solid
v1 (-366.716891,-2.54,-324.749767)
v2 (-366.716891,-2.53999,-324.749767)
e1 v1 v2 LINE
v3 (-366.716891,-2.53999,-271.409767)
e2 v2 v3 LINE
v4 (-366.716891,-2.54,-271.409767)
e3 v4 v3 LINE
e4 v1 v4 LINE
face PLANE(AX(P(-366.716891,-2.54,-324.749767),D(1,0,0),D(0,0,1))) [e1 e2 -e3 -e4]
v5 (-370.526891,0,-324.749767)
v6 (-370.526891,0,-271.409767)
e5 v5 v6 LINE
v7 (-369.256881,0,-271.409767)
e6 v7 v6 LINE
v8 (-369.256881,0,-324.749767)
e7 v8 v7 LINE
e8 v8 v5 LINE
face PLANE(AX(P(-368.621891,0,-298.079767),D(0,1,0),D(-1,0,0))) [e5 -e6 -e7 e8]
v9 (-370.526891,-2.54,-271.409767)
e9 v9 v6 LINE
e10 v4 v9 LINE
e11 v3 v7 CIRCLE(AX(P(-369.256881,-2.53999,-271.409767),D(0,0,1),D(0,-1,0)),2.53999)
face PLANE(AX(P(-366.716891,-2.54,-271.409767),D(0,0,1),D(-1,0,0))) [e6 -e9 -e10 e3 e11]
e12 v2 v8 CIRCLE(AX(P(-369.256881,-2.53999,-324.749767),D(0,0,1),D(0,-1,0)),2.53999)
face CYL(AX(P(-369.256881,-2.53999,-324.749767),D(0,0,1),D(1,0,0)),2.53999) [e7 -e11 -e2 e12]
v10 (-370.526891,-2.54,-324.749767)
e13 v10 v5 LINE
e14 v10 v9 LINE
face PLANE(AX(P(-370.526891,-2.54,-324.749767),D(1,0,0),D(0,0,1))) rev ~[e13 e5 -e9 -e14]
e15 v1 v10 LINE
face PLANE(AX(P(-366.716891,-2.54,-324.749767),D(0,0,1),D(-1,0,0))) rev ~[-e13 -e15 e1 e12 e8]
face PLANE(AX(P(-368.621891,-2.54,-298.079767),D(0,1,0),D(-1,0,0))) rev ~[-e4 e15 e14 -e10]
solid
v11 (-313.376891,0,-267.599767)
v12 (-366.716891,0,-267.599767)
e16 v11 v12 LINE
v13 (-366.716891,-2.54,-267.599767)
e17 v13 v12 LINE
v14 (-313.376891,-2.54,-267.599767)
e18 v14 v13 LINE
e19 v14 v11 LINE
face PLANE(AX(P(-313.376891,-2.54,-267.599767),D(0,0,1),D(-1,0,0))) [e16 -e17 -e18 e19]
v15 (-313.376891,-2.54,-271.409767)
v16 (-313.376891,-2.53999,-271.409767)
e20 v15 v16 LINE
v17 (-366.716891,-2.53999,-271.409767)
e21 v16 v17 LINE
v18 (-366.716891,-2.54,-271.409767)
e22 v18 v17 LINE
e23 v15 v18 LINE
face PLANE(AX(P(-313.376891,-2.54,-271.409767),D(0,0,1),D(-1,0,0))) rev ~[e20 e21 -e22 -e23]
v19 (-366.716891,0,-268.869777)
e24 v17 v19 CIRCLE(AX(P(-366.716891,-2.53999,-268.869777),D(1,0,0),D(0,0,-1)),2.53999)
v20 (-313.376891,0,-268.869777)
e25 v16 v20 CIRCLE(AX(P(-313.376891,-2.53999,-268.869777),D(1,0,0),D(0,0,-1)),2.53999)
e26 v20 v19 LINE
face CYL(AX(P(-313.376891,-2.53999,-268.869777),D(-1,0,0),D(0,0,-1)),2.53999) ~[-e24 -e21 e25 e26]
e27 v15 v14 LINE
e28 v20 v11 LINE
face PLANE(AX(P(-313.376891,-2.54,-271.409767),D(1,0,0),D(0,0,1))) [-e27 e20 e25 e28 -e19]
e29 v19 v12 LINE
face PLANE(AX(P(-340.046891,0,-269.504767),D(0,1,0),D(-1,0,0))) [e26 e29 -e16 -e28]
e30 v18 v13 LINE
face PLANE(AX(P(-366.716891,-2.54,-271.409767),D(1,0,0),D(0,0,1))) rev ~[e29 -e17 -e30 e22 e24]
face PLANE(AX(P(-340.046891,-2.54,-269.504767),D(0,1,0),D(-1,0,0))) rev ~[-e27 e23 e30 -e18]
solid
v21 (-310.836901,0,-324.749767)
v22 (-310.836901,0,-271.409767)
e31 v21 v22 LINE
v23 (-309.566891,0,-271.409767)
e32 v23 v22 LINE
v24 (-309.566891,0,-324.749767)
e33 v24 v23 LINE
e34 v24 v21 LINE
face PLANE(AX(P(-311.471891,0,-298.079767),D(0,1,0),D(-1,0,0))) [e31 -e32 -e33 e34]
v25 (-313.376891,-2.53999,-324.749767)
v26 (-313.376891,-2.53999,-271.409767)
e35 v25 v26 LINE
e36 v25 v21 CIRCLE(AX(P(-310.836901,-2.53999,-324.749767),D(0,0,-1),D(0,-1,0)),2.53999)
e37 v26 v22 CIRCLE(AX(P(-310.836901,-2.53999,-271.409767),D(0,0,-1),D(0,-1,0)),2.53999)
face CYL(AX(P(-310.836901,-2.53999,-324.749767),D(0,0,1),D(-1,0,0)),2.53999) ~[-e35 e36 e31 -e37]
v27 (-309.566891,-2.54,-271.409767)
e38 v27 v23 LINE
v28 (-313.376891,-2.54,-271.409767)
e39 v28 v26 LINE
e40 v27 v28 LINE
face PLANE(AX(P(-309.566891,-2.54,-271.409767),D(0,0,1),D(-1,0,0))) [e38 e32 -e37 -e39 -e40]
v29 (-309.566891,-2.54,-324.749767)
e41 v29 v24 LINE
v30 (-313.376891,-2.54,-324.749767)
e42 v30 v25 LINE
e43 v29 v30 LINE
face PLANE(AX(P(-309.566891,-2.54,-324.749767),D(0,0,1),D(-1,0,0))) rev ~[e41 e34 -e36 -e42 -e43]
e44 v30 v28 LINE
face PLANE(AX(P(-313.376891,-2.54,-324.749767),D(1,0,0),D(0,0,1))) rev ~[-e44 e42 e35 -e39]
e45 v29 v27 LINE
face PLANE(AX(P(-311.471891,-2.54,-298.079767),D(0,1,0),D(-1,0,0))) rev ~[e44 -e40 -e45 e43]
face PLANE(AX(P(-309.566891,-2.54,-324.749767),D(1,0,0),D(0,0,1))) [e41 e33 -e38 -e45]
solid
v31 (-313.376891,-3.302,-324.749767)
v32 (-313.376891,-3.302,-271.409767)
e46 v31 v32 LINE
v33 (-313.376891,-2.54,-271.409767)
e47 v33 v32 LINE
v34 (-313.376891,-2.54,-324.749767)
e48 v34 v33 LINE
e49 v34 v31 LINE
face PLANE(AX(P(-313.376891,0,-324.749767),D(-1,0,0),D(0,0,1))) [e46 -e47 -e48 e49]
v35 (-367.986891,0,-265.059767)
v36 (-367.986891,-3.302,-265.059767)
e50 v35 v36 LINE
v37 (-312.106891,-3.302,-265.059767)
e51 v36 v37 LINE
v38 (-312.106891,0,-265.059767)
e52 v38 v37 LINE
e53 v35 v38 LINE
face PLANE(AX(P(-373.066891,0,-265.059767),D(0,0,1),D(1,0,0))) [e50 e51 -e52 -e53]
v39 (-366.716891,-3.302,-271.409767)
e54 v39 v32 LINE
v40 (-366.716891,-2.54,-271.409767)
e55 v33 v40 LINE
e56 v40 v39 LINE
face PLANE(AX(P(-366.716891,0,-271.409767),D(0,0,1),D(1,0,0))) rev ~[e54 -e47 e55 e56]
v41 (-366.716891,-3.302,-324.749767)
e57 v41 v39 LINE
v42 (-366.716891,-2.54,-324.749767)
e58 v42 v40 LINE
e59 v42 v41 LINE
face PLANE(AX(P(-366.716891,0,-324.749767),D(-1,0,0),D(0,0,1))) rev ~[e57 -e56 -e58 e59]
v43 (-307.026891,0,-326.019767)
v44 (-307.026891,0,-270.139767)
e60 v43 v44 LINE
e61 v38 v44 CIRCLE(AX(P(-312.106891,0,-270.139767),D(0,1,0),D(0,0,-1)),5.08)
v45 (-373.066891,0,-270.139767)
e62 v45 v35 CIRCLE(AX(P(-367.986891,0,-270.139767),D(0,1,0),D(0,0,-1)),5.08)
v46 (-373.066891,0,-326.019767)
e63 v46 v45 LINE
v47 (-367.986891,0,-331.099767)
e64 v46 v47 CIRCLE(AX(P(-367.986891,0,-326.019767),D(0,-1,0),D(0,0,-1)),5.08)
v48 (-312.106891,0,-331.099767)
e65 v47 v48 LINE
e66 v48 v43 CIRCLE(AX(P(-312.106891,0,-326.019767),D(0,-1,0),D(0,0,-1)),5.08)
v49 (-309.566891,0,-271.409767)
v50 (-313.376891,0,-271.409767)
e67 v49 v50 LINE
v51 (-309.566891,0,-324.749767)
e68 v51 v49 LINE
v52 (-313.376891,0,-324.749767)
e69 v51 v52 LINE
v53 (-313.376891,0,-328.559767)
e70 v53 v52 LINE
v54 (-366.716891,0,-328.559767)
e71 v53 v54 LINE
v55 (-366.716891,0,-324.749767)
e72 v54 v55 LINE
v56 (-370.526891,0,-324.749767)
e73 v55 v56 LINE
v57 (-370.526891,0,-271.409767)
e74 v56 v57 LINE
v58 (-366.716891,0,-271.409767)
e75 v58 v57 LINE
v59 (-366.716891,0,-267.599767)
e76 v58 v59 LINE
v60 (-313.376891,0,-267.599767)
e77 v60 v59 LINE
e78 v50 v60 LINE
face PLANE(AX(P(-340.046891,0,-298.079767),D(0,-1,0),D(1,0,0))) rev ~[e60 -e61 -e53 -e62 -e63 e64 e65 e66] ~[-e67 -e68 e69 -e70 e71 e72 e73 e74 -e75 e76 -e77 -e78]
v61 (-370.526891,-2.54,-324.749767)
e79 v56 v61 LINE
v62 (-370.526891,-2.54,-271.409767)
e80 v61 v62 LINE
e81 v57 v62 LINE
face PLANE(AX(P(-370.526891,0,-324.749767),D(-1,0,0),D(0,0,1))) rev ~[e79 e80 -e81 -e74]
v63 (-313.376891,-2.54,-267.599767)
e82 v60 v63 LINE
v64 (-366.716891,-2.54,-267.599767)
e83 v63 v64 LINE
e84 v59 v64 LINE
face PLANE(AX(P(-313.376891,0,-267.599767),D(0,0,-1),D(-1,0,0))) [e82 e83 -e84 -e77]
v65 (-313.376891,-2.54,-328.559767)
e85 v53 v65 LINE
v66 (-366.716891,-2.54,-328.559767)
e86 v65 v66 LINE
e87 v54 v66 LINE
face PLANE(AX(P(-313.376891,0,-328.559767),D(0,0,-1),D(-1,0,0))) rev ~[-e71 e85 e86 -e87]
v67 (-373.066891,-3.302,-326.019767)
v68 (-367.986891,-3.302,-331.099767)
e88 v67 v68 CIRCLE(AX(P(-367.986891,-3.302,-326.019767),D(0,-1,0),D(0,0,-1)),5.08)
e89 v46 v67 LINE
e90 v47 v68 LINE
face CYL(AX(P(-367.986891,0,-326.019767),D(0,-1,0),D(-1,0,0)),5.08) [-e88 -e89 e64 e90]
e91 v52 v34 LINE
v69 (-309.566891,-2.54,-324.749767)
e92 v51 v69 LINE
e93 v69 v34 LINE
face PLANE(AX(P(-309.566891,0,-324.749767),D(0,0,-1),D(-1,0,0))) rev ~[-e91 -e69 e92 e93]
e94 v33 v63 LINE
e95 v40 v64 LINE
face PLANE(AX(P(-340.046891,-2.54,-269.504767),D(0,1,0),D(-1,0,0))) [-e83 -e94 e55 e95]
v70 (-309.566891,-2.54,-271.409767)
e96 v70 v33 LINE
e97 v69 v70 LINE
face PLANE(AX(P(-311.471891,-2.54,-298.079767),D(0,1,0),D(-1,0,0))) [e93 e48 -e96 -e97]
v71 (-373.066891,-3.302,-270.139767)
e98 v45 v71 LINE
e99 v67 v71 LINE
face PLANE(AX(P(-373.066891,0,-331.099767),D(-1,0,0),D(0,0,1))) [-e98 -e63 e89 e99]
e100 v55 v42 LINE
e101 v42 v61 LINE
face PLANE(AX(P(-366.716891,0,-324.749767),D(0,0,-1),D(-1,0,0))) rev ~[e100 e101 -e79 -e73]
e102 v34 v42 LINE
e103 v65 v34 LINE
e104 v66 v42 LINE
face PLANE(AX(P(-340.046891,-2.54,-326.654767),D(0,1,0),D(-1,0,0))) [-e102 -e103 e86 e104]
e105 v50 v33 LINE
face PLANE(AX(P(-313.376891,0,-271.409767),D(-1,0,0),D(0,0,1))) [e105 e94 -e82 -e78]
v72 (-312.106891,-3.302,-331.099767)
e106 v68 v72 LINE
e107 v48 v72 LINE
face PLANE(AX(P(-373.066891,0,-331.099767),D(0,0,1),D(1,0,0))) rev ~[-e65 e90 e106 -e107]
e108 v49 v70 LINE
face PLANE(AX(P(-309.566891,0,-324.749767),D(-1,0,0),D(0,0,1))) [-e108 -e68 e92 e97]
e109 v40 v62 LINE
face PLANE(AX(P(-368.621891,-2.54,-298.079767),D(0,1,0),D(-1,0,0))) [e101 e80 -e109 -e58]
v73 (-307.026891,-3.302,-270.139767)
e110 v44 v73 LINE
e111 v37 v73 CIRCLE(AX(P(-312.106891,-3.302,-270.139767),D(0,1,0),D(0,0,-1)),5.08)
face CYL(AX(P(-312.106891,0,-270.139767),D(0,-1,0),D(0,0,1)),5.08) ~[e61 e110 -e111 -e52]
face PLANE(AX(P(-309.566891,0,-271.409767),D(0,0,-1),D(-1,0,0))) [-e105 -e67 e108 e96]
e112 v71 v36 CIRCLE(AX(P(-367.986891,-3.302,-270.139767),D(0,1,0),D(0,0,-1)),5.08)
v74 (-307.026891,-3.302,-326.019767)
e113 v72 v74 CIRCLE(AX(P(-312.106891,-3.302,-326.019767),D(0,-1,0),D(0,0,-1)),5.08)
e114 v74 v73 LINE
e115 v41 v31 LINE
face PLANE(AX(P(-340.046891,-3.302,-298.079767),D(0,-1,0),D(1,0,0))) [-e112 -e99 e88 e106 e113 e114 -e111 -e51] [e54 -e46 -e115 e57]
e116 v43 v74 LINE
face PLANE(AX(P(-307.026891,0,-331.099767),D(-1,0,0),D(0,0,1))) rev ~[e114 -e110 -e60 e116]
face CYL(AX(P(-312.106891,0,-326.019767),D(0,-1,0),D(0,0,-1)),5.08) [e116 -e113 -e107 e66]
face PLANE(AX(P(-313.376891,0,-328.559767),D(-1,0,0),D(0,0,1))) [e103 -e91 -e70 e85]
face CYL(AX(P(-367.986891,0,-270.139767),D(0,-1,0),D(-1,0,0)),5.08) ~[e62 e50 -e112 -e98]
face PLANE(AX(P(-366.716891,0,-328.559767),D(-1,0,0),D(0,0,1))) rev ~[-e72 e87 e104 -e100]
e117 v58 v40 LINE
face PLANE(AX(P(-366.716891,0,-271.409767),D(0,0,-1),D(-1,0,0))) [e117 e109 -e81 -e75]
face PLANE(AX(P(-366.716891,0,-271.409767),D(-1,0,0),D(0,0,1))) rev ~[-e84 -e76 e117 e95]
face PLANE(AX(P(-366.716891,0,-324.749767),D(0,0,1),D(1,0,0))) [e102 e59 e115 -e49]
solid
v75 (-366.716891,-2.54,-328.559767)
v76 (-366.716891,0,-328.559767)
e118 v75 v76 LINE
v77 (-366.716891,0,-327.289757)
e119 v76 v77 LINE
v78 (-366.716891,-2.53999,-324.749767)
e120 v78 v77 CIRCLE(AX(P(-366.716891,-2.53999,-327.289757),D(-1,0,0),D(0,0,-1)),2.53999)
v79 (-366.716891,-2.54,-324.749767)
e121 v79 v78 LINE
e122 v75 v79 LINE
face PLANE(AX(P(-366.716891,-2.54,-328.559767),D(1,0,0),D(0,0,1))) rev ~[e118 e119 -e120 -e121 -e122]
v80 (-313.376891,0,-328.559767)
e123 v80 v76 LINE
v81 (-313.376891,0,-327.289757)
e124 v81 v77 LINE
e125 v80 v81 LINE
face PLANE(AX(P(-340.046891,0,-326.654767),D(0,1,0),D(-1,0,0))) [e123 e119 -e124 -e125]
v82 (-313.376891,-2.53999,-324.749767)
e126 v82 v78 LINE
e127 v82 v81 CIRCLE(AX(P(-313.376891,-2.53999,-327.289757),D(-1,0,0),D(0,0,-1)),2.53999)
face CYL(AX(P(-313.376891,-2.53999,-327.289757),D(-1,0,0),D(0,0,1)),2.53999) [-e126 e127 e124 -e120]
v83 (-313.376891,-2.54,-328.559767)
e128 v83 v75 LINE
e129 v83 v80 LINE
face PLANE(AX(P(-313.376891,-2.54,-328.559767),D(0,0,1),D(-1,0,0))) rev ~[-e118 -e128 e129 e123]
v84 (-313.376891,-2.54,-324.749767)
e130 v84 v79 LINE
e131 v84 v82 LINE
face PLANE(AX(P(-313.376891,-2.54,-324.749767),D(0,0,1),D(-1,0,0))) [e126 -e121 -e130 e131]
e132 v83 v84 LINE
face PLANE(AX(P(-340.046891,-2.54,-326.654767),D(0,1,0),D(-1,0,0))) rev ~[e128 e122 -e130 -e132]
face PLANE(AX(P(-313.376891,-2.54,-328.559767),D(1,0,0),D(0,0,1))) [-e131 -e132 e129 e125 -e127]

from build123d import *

# Parameters (mm, degrees)
F0_W     = 66.04
F0_H     = 66.04
F0_W_2   = 53.34
F0_H_2   = 53.34
F1_DEPTH = 3.302
F2_R     = 5.08
F3_W     = 53.34
F3_H     = 3.81
F3_W_2   = 3.81
F3_H_2   = 53.34
F4_DEPTH = 2.54
F6_W     = 53.34
F6_H     = 3.81
F9_DEPTH = 2.54
F5_W     = 3.81
F5_H     = 53.34
F8_W     = 53.34
F8_H     = 3.81
F7_W     = 3.81
F7_H     = 53.34
F10_R    = 2.53999
F10_2_R  = 2.53999
F10_3_R  = 2.53999
F10_4_R  = 2.53999


# Not quite as in the source:
# - a fillet or chamfer is up to 0.001 mm smaller than in the source, because OpenCascade refuses the exact size


with BuildPart() as f1:
    # F0 (on Front) → F1 (new body)
    with BuildSketch(Plane.XZ):
        with Locations((-340.0468912915, -298.0797665718)):
            Rectangle(F0_W, F0_H)
        with Locations((-340.0468912915, -298.0797665718)):
            Rectangle(F0_W_2, F0_H_2, mode=Mode.SUBTRACT)
    extrude(amount=F1_DEPTH)

    # F2
    f2_edges = [f1.edges().sort_by_distance(p)[0] for p in [
        (-307.026891, -1.651, -331.099767),
        (-373.066891, -1.651, -331.099767),
        (-373.066891, -1.651, -265.059767),
        (-307.026891, -1.651, -265.059767),
    ]]
    fillet(f2_edges, radius=F2_R)

    # F3 (on face) → F4 (cut)
    with BuildSketch(Plane(origin=(0, 0, 0), x_dir=(-1, 0, 0), z_dir=(0, 1, 0))):
        with Locations((340.0468912915, -326.6547665718)):
            Rectangle(F3_W, F3_H)
        with Locations((368.6218912915, -298.0797665718)):
            Rectangle(F3_W_2, F3_H_2)
        with Locations((340.0468912915, -269.5047665718)):
            Rectangle(F3_W, F3_H)
        with Locations((311.4718912915, -298.0797665718)):
            Rectangle(F3_W_2, F3_H_2)
    extrude(amount=-F4_DEPTH, mode=Mode.SUBTRACT)


with BuildPart() as f9:
    # F6 (on face) → F9 (new body)
    with BuildSketch(Plane(origin=(0, -2.54, 0), x_dir=(-1, 0, 0), z_dir=(0, 1, 0))):
        with Locations((340.0468912915, -326.6547665718)):
            Rectangle(F6_W, F6_H)
    extrude(amount=F9_DEPTH)

    # F10#2 (radius 2.54 in the source; OpenCascade refuses exactly that, so slightly less here)
    f10_2_edges = [f9.edges().sort_by_distance(p)[0] for p in [
        (-340.046891, 0, -324.749767),
    ]]
    fillet(f10_2_edges, radius=F10_2_R)


with BuildPart() as f9b:
    # F5 (on face) → F9, piece 2 (new body)
    with BuildSketch(Plane(origin=(0, -2.54, 0), x_dir=(-1, 0, 0), z_dir=(0, 1, 0))):
        with Locations((311.4718912915, -298.0797665718)):
            Rectangle(F5_W, F5_H)
    extrude(amount=F9_DEPTH)

    # F10 (radius 2.54 in the source; OpenCascade refuses exactly that, so slightly less here)
    f10_edges = [f9b.edges().sort_by_distance(p)[0] for p in [
        (-313.376891, 0, -298.079767),
    ]]
    fillet(f10_edges, radius=F10_R)


with BuildPart() as f9c:
    # F8 (on face) → F9, piece 3 (new body)
    with BuildSketch(Plane(origin=(0, -2.54, 0), x_dir=(-1, 0, 0), z_dir=(0, 1, 0))):
        with Locations((340.0468912915, -269.5047665718)):
            Rectangle(F8_W, F8_H)
    extrude(amount=F9_DEPTH)

    # F10#4 (radius 2.54 in the source; OpenCascade refuses exactly that, so slightly less here)
    f10_4_edges = [f9c.edges().sort_by_distance(p)[0] for p in [
        (-340.046891, 0, -271.409767),
    ]]
    fillet(f10_4_edges, radius=F10_4_R)


with BuildPart() as f9d:
    # F7 (on face) → F9, piece 4 (new body)
    with BuildSketch(Plane(origin=(0, -2.54, 0), x_dir=(-1, 0, 0), z_dir=(0, 1, 0))):
        with Locations((368.6218912915, -298.0797665718)):
            Rectangle(F7_W, F7_H)
    extrude(amount=F9_DEPTH)

    # F10#3 (radius 2.54 in the source; OpenCascade refuses exactly that, so slightly less here)
    f10_3_edges = [f9d.edges().sort_by_distance(p)[0] for p in [
        (-366.716891, 0, -298.079767),
    ]]
    fillet(f10_3_edges, radius=F10_3_R)


solid = Compound([f1.part, f9.part, f9b.part, f9c.part, f9d.part])
